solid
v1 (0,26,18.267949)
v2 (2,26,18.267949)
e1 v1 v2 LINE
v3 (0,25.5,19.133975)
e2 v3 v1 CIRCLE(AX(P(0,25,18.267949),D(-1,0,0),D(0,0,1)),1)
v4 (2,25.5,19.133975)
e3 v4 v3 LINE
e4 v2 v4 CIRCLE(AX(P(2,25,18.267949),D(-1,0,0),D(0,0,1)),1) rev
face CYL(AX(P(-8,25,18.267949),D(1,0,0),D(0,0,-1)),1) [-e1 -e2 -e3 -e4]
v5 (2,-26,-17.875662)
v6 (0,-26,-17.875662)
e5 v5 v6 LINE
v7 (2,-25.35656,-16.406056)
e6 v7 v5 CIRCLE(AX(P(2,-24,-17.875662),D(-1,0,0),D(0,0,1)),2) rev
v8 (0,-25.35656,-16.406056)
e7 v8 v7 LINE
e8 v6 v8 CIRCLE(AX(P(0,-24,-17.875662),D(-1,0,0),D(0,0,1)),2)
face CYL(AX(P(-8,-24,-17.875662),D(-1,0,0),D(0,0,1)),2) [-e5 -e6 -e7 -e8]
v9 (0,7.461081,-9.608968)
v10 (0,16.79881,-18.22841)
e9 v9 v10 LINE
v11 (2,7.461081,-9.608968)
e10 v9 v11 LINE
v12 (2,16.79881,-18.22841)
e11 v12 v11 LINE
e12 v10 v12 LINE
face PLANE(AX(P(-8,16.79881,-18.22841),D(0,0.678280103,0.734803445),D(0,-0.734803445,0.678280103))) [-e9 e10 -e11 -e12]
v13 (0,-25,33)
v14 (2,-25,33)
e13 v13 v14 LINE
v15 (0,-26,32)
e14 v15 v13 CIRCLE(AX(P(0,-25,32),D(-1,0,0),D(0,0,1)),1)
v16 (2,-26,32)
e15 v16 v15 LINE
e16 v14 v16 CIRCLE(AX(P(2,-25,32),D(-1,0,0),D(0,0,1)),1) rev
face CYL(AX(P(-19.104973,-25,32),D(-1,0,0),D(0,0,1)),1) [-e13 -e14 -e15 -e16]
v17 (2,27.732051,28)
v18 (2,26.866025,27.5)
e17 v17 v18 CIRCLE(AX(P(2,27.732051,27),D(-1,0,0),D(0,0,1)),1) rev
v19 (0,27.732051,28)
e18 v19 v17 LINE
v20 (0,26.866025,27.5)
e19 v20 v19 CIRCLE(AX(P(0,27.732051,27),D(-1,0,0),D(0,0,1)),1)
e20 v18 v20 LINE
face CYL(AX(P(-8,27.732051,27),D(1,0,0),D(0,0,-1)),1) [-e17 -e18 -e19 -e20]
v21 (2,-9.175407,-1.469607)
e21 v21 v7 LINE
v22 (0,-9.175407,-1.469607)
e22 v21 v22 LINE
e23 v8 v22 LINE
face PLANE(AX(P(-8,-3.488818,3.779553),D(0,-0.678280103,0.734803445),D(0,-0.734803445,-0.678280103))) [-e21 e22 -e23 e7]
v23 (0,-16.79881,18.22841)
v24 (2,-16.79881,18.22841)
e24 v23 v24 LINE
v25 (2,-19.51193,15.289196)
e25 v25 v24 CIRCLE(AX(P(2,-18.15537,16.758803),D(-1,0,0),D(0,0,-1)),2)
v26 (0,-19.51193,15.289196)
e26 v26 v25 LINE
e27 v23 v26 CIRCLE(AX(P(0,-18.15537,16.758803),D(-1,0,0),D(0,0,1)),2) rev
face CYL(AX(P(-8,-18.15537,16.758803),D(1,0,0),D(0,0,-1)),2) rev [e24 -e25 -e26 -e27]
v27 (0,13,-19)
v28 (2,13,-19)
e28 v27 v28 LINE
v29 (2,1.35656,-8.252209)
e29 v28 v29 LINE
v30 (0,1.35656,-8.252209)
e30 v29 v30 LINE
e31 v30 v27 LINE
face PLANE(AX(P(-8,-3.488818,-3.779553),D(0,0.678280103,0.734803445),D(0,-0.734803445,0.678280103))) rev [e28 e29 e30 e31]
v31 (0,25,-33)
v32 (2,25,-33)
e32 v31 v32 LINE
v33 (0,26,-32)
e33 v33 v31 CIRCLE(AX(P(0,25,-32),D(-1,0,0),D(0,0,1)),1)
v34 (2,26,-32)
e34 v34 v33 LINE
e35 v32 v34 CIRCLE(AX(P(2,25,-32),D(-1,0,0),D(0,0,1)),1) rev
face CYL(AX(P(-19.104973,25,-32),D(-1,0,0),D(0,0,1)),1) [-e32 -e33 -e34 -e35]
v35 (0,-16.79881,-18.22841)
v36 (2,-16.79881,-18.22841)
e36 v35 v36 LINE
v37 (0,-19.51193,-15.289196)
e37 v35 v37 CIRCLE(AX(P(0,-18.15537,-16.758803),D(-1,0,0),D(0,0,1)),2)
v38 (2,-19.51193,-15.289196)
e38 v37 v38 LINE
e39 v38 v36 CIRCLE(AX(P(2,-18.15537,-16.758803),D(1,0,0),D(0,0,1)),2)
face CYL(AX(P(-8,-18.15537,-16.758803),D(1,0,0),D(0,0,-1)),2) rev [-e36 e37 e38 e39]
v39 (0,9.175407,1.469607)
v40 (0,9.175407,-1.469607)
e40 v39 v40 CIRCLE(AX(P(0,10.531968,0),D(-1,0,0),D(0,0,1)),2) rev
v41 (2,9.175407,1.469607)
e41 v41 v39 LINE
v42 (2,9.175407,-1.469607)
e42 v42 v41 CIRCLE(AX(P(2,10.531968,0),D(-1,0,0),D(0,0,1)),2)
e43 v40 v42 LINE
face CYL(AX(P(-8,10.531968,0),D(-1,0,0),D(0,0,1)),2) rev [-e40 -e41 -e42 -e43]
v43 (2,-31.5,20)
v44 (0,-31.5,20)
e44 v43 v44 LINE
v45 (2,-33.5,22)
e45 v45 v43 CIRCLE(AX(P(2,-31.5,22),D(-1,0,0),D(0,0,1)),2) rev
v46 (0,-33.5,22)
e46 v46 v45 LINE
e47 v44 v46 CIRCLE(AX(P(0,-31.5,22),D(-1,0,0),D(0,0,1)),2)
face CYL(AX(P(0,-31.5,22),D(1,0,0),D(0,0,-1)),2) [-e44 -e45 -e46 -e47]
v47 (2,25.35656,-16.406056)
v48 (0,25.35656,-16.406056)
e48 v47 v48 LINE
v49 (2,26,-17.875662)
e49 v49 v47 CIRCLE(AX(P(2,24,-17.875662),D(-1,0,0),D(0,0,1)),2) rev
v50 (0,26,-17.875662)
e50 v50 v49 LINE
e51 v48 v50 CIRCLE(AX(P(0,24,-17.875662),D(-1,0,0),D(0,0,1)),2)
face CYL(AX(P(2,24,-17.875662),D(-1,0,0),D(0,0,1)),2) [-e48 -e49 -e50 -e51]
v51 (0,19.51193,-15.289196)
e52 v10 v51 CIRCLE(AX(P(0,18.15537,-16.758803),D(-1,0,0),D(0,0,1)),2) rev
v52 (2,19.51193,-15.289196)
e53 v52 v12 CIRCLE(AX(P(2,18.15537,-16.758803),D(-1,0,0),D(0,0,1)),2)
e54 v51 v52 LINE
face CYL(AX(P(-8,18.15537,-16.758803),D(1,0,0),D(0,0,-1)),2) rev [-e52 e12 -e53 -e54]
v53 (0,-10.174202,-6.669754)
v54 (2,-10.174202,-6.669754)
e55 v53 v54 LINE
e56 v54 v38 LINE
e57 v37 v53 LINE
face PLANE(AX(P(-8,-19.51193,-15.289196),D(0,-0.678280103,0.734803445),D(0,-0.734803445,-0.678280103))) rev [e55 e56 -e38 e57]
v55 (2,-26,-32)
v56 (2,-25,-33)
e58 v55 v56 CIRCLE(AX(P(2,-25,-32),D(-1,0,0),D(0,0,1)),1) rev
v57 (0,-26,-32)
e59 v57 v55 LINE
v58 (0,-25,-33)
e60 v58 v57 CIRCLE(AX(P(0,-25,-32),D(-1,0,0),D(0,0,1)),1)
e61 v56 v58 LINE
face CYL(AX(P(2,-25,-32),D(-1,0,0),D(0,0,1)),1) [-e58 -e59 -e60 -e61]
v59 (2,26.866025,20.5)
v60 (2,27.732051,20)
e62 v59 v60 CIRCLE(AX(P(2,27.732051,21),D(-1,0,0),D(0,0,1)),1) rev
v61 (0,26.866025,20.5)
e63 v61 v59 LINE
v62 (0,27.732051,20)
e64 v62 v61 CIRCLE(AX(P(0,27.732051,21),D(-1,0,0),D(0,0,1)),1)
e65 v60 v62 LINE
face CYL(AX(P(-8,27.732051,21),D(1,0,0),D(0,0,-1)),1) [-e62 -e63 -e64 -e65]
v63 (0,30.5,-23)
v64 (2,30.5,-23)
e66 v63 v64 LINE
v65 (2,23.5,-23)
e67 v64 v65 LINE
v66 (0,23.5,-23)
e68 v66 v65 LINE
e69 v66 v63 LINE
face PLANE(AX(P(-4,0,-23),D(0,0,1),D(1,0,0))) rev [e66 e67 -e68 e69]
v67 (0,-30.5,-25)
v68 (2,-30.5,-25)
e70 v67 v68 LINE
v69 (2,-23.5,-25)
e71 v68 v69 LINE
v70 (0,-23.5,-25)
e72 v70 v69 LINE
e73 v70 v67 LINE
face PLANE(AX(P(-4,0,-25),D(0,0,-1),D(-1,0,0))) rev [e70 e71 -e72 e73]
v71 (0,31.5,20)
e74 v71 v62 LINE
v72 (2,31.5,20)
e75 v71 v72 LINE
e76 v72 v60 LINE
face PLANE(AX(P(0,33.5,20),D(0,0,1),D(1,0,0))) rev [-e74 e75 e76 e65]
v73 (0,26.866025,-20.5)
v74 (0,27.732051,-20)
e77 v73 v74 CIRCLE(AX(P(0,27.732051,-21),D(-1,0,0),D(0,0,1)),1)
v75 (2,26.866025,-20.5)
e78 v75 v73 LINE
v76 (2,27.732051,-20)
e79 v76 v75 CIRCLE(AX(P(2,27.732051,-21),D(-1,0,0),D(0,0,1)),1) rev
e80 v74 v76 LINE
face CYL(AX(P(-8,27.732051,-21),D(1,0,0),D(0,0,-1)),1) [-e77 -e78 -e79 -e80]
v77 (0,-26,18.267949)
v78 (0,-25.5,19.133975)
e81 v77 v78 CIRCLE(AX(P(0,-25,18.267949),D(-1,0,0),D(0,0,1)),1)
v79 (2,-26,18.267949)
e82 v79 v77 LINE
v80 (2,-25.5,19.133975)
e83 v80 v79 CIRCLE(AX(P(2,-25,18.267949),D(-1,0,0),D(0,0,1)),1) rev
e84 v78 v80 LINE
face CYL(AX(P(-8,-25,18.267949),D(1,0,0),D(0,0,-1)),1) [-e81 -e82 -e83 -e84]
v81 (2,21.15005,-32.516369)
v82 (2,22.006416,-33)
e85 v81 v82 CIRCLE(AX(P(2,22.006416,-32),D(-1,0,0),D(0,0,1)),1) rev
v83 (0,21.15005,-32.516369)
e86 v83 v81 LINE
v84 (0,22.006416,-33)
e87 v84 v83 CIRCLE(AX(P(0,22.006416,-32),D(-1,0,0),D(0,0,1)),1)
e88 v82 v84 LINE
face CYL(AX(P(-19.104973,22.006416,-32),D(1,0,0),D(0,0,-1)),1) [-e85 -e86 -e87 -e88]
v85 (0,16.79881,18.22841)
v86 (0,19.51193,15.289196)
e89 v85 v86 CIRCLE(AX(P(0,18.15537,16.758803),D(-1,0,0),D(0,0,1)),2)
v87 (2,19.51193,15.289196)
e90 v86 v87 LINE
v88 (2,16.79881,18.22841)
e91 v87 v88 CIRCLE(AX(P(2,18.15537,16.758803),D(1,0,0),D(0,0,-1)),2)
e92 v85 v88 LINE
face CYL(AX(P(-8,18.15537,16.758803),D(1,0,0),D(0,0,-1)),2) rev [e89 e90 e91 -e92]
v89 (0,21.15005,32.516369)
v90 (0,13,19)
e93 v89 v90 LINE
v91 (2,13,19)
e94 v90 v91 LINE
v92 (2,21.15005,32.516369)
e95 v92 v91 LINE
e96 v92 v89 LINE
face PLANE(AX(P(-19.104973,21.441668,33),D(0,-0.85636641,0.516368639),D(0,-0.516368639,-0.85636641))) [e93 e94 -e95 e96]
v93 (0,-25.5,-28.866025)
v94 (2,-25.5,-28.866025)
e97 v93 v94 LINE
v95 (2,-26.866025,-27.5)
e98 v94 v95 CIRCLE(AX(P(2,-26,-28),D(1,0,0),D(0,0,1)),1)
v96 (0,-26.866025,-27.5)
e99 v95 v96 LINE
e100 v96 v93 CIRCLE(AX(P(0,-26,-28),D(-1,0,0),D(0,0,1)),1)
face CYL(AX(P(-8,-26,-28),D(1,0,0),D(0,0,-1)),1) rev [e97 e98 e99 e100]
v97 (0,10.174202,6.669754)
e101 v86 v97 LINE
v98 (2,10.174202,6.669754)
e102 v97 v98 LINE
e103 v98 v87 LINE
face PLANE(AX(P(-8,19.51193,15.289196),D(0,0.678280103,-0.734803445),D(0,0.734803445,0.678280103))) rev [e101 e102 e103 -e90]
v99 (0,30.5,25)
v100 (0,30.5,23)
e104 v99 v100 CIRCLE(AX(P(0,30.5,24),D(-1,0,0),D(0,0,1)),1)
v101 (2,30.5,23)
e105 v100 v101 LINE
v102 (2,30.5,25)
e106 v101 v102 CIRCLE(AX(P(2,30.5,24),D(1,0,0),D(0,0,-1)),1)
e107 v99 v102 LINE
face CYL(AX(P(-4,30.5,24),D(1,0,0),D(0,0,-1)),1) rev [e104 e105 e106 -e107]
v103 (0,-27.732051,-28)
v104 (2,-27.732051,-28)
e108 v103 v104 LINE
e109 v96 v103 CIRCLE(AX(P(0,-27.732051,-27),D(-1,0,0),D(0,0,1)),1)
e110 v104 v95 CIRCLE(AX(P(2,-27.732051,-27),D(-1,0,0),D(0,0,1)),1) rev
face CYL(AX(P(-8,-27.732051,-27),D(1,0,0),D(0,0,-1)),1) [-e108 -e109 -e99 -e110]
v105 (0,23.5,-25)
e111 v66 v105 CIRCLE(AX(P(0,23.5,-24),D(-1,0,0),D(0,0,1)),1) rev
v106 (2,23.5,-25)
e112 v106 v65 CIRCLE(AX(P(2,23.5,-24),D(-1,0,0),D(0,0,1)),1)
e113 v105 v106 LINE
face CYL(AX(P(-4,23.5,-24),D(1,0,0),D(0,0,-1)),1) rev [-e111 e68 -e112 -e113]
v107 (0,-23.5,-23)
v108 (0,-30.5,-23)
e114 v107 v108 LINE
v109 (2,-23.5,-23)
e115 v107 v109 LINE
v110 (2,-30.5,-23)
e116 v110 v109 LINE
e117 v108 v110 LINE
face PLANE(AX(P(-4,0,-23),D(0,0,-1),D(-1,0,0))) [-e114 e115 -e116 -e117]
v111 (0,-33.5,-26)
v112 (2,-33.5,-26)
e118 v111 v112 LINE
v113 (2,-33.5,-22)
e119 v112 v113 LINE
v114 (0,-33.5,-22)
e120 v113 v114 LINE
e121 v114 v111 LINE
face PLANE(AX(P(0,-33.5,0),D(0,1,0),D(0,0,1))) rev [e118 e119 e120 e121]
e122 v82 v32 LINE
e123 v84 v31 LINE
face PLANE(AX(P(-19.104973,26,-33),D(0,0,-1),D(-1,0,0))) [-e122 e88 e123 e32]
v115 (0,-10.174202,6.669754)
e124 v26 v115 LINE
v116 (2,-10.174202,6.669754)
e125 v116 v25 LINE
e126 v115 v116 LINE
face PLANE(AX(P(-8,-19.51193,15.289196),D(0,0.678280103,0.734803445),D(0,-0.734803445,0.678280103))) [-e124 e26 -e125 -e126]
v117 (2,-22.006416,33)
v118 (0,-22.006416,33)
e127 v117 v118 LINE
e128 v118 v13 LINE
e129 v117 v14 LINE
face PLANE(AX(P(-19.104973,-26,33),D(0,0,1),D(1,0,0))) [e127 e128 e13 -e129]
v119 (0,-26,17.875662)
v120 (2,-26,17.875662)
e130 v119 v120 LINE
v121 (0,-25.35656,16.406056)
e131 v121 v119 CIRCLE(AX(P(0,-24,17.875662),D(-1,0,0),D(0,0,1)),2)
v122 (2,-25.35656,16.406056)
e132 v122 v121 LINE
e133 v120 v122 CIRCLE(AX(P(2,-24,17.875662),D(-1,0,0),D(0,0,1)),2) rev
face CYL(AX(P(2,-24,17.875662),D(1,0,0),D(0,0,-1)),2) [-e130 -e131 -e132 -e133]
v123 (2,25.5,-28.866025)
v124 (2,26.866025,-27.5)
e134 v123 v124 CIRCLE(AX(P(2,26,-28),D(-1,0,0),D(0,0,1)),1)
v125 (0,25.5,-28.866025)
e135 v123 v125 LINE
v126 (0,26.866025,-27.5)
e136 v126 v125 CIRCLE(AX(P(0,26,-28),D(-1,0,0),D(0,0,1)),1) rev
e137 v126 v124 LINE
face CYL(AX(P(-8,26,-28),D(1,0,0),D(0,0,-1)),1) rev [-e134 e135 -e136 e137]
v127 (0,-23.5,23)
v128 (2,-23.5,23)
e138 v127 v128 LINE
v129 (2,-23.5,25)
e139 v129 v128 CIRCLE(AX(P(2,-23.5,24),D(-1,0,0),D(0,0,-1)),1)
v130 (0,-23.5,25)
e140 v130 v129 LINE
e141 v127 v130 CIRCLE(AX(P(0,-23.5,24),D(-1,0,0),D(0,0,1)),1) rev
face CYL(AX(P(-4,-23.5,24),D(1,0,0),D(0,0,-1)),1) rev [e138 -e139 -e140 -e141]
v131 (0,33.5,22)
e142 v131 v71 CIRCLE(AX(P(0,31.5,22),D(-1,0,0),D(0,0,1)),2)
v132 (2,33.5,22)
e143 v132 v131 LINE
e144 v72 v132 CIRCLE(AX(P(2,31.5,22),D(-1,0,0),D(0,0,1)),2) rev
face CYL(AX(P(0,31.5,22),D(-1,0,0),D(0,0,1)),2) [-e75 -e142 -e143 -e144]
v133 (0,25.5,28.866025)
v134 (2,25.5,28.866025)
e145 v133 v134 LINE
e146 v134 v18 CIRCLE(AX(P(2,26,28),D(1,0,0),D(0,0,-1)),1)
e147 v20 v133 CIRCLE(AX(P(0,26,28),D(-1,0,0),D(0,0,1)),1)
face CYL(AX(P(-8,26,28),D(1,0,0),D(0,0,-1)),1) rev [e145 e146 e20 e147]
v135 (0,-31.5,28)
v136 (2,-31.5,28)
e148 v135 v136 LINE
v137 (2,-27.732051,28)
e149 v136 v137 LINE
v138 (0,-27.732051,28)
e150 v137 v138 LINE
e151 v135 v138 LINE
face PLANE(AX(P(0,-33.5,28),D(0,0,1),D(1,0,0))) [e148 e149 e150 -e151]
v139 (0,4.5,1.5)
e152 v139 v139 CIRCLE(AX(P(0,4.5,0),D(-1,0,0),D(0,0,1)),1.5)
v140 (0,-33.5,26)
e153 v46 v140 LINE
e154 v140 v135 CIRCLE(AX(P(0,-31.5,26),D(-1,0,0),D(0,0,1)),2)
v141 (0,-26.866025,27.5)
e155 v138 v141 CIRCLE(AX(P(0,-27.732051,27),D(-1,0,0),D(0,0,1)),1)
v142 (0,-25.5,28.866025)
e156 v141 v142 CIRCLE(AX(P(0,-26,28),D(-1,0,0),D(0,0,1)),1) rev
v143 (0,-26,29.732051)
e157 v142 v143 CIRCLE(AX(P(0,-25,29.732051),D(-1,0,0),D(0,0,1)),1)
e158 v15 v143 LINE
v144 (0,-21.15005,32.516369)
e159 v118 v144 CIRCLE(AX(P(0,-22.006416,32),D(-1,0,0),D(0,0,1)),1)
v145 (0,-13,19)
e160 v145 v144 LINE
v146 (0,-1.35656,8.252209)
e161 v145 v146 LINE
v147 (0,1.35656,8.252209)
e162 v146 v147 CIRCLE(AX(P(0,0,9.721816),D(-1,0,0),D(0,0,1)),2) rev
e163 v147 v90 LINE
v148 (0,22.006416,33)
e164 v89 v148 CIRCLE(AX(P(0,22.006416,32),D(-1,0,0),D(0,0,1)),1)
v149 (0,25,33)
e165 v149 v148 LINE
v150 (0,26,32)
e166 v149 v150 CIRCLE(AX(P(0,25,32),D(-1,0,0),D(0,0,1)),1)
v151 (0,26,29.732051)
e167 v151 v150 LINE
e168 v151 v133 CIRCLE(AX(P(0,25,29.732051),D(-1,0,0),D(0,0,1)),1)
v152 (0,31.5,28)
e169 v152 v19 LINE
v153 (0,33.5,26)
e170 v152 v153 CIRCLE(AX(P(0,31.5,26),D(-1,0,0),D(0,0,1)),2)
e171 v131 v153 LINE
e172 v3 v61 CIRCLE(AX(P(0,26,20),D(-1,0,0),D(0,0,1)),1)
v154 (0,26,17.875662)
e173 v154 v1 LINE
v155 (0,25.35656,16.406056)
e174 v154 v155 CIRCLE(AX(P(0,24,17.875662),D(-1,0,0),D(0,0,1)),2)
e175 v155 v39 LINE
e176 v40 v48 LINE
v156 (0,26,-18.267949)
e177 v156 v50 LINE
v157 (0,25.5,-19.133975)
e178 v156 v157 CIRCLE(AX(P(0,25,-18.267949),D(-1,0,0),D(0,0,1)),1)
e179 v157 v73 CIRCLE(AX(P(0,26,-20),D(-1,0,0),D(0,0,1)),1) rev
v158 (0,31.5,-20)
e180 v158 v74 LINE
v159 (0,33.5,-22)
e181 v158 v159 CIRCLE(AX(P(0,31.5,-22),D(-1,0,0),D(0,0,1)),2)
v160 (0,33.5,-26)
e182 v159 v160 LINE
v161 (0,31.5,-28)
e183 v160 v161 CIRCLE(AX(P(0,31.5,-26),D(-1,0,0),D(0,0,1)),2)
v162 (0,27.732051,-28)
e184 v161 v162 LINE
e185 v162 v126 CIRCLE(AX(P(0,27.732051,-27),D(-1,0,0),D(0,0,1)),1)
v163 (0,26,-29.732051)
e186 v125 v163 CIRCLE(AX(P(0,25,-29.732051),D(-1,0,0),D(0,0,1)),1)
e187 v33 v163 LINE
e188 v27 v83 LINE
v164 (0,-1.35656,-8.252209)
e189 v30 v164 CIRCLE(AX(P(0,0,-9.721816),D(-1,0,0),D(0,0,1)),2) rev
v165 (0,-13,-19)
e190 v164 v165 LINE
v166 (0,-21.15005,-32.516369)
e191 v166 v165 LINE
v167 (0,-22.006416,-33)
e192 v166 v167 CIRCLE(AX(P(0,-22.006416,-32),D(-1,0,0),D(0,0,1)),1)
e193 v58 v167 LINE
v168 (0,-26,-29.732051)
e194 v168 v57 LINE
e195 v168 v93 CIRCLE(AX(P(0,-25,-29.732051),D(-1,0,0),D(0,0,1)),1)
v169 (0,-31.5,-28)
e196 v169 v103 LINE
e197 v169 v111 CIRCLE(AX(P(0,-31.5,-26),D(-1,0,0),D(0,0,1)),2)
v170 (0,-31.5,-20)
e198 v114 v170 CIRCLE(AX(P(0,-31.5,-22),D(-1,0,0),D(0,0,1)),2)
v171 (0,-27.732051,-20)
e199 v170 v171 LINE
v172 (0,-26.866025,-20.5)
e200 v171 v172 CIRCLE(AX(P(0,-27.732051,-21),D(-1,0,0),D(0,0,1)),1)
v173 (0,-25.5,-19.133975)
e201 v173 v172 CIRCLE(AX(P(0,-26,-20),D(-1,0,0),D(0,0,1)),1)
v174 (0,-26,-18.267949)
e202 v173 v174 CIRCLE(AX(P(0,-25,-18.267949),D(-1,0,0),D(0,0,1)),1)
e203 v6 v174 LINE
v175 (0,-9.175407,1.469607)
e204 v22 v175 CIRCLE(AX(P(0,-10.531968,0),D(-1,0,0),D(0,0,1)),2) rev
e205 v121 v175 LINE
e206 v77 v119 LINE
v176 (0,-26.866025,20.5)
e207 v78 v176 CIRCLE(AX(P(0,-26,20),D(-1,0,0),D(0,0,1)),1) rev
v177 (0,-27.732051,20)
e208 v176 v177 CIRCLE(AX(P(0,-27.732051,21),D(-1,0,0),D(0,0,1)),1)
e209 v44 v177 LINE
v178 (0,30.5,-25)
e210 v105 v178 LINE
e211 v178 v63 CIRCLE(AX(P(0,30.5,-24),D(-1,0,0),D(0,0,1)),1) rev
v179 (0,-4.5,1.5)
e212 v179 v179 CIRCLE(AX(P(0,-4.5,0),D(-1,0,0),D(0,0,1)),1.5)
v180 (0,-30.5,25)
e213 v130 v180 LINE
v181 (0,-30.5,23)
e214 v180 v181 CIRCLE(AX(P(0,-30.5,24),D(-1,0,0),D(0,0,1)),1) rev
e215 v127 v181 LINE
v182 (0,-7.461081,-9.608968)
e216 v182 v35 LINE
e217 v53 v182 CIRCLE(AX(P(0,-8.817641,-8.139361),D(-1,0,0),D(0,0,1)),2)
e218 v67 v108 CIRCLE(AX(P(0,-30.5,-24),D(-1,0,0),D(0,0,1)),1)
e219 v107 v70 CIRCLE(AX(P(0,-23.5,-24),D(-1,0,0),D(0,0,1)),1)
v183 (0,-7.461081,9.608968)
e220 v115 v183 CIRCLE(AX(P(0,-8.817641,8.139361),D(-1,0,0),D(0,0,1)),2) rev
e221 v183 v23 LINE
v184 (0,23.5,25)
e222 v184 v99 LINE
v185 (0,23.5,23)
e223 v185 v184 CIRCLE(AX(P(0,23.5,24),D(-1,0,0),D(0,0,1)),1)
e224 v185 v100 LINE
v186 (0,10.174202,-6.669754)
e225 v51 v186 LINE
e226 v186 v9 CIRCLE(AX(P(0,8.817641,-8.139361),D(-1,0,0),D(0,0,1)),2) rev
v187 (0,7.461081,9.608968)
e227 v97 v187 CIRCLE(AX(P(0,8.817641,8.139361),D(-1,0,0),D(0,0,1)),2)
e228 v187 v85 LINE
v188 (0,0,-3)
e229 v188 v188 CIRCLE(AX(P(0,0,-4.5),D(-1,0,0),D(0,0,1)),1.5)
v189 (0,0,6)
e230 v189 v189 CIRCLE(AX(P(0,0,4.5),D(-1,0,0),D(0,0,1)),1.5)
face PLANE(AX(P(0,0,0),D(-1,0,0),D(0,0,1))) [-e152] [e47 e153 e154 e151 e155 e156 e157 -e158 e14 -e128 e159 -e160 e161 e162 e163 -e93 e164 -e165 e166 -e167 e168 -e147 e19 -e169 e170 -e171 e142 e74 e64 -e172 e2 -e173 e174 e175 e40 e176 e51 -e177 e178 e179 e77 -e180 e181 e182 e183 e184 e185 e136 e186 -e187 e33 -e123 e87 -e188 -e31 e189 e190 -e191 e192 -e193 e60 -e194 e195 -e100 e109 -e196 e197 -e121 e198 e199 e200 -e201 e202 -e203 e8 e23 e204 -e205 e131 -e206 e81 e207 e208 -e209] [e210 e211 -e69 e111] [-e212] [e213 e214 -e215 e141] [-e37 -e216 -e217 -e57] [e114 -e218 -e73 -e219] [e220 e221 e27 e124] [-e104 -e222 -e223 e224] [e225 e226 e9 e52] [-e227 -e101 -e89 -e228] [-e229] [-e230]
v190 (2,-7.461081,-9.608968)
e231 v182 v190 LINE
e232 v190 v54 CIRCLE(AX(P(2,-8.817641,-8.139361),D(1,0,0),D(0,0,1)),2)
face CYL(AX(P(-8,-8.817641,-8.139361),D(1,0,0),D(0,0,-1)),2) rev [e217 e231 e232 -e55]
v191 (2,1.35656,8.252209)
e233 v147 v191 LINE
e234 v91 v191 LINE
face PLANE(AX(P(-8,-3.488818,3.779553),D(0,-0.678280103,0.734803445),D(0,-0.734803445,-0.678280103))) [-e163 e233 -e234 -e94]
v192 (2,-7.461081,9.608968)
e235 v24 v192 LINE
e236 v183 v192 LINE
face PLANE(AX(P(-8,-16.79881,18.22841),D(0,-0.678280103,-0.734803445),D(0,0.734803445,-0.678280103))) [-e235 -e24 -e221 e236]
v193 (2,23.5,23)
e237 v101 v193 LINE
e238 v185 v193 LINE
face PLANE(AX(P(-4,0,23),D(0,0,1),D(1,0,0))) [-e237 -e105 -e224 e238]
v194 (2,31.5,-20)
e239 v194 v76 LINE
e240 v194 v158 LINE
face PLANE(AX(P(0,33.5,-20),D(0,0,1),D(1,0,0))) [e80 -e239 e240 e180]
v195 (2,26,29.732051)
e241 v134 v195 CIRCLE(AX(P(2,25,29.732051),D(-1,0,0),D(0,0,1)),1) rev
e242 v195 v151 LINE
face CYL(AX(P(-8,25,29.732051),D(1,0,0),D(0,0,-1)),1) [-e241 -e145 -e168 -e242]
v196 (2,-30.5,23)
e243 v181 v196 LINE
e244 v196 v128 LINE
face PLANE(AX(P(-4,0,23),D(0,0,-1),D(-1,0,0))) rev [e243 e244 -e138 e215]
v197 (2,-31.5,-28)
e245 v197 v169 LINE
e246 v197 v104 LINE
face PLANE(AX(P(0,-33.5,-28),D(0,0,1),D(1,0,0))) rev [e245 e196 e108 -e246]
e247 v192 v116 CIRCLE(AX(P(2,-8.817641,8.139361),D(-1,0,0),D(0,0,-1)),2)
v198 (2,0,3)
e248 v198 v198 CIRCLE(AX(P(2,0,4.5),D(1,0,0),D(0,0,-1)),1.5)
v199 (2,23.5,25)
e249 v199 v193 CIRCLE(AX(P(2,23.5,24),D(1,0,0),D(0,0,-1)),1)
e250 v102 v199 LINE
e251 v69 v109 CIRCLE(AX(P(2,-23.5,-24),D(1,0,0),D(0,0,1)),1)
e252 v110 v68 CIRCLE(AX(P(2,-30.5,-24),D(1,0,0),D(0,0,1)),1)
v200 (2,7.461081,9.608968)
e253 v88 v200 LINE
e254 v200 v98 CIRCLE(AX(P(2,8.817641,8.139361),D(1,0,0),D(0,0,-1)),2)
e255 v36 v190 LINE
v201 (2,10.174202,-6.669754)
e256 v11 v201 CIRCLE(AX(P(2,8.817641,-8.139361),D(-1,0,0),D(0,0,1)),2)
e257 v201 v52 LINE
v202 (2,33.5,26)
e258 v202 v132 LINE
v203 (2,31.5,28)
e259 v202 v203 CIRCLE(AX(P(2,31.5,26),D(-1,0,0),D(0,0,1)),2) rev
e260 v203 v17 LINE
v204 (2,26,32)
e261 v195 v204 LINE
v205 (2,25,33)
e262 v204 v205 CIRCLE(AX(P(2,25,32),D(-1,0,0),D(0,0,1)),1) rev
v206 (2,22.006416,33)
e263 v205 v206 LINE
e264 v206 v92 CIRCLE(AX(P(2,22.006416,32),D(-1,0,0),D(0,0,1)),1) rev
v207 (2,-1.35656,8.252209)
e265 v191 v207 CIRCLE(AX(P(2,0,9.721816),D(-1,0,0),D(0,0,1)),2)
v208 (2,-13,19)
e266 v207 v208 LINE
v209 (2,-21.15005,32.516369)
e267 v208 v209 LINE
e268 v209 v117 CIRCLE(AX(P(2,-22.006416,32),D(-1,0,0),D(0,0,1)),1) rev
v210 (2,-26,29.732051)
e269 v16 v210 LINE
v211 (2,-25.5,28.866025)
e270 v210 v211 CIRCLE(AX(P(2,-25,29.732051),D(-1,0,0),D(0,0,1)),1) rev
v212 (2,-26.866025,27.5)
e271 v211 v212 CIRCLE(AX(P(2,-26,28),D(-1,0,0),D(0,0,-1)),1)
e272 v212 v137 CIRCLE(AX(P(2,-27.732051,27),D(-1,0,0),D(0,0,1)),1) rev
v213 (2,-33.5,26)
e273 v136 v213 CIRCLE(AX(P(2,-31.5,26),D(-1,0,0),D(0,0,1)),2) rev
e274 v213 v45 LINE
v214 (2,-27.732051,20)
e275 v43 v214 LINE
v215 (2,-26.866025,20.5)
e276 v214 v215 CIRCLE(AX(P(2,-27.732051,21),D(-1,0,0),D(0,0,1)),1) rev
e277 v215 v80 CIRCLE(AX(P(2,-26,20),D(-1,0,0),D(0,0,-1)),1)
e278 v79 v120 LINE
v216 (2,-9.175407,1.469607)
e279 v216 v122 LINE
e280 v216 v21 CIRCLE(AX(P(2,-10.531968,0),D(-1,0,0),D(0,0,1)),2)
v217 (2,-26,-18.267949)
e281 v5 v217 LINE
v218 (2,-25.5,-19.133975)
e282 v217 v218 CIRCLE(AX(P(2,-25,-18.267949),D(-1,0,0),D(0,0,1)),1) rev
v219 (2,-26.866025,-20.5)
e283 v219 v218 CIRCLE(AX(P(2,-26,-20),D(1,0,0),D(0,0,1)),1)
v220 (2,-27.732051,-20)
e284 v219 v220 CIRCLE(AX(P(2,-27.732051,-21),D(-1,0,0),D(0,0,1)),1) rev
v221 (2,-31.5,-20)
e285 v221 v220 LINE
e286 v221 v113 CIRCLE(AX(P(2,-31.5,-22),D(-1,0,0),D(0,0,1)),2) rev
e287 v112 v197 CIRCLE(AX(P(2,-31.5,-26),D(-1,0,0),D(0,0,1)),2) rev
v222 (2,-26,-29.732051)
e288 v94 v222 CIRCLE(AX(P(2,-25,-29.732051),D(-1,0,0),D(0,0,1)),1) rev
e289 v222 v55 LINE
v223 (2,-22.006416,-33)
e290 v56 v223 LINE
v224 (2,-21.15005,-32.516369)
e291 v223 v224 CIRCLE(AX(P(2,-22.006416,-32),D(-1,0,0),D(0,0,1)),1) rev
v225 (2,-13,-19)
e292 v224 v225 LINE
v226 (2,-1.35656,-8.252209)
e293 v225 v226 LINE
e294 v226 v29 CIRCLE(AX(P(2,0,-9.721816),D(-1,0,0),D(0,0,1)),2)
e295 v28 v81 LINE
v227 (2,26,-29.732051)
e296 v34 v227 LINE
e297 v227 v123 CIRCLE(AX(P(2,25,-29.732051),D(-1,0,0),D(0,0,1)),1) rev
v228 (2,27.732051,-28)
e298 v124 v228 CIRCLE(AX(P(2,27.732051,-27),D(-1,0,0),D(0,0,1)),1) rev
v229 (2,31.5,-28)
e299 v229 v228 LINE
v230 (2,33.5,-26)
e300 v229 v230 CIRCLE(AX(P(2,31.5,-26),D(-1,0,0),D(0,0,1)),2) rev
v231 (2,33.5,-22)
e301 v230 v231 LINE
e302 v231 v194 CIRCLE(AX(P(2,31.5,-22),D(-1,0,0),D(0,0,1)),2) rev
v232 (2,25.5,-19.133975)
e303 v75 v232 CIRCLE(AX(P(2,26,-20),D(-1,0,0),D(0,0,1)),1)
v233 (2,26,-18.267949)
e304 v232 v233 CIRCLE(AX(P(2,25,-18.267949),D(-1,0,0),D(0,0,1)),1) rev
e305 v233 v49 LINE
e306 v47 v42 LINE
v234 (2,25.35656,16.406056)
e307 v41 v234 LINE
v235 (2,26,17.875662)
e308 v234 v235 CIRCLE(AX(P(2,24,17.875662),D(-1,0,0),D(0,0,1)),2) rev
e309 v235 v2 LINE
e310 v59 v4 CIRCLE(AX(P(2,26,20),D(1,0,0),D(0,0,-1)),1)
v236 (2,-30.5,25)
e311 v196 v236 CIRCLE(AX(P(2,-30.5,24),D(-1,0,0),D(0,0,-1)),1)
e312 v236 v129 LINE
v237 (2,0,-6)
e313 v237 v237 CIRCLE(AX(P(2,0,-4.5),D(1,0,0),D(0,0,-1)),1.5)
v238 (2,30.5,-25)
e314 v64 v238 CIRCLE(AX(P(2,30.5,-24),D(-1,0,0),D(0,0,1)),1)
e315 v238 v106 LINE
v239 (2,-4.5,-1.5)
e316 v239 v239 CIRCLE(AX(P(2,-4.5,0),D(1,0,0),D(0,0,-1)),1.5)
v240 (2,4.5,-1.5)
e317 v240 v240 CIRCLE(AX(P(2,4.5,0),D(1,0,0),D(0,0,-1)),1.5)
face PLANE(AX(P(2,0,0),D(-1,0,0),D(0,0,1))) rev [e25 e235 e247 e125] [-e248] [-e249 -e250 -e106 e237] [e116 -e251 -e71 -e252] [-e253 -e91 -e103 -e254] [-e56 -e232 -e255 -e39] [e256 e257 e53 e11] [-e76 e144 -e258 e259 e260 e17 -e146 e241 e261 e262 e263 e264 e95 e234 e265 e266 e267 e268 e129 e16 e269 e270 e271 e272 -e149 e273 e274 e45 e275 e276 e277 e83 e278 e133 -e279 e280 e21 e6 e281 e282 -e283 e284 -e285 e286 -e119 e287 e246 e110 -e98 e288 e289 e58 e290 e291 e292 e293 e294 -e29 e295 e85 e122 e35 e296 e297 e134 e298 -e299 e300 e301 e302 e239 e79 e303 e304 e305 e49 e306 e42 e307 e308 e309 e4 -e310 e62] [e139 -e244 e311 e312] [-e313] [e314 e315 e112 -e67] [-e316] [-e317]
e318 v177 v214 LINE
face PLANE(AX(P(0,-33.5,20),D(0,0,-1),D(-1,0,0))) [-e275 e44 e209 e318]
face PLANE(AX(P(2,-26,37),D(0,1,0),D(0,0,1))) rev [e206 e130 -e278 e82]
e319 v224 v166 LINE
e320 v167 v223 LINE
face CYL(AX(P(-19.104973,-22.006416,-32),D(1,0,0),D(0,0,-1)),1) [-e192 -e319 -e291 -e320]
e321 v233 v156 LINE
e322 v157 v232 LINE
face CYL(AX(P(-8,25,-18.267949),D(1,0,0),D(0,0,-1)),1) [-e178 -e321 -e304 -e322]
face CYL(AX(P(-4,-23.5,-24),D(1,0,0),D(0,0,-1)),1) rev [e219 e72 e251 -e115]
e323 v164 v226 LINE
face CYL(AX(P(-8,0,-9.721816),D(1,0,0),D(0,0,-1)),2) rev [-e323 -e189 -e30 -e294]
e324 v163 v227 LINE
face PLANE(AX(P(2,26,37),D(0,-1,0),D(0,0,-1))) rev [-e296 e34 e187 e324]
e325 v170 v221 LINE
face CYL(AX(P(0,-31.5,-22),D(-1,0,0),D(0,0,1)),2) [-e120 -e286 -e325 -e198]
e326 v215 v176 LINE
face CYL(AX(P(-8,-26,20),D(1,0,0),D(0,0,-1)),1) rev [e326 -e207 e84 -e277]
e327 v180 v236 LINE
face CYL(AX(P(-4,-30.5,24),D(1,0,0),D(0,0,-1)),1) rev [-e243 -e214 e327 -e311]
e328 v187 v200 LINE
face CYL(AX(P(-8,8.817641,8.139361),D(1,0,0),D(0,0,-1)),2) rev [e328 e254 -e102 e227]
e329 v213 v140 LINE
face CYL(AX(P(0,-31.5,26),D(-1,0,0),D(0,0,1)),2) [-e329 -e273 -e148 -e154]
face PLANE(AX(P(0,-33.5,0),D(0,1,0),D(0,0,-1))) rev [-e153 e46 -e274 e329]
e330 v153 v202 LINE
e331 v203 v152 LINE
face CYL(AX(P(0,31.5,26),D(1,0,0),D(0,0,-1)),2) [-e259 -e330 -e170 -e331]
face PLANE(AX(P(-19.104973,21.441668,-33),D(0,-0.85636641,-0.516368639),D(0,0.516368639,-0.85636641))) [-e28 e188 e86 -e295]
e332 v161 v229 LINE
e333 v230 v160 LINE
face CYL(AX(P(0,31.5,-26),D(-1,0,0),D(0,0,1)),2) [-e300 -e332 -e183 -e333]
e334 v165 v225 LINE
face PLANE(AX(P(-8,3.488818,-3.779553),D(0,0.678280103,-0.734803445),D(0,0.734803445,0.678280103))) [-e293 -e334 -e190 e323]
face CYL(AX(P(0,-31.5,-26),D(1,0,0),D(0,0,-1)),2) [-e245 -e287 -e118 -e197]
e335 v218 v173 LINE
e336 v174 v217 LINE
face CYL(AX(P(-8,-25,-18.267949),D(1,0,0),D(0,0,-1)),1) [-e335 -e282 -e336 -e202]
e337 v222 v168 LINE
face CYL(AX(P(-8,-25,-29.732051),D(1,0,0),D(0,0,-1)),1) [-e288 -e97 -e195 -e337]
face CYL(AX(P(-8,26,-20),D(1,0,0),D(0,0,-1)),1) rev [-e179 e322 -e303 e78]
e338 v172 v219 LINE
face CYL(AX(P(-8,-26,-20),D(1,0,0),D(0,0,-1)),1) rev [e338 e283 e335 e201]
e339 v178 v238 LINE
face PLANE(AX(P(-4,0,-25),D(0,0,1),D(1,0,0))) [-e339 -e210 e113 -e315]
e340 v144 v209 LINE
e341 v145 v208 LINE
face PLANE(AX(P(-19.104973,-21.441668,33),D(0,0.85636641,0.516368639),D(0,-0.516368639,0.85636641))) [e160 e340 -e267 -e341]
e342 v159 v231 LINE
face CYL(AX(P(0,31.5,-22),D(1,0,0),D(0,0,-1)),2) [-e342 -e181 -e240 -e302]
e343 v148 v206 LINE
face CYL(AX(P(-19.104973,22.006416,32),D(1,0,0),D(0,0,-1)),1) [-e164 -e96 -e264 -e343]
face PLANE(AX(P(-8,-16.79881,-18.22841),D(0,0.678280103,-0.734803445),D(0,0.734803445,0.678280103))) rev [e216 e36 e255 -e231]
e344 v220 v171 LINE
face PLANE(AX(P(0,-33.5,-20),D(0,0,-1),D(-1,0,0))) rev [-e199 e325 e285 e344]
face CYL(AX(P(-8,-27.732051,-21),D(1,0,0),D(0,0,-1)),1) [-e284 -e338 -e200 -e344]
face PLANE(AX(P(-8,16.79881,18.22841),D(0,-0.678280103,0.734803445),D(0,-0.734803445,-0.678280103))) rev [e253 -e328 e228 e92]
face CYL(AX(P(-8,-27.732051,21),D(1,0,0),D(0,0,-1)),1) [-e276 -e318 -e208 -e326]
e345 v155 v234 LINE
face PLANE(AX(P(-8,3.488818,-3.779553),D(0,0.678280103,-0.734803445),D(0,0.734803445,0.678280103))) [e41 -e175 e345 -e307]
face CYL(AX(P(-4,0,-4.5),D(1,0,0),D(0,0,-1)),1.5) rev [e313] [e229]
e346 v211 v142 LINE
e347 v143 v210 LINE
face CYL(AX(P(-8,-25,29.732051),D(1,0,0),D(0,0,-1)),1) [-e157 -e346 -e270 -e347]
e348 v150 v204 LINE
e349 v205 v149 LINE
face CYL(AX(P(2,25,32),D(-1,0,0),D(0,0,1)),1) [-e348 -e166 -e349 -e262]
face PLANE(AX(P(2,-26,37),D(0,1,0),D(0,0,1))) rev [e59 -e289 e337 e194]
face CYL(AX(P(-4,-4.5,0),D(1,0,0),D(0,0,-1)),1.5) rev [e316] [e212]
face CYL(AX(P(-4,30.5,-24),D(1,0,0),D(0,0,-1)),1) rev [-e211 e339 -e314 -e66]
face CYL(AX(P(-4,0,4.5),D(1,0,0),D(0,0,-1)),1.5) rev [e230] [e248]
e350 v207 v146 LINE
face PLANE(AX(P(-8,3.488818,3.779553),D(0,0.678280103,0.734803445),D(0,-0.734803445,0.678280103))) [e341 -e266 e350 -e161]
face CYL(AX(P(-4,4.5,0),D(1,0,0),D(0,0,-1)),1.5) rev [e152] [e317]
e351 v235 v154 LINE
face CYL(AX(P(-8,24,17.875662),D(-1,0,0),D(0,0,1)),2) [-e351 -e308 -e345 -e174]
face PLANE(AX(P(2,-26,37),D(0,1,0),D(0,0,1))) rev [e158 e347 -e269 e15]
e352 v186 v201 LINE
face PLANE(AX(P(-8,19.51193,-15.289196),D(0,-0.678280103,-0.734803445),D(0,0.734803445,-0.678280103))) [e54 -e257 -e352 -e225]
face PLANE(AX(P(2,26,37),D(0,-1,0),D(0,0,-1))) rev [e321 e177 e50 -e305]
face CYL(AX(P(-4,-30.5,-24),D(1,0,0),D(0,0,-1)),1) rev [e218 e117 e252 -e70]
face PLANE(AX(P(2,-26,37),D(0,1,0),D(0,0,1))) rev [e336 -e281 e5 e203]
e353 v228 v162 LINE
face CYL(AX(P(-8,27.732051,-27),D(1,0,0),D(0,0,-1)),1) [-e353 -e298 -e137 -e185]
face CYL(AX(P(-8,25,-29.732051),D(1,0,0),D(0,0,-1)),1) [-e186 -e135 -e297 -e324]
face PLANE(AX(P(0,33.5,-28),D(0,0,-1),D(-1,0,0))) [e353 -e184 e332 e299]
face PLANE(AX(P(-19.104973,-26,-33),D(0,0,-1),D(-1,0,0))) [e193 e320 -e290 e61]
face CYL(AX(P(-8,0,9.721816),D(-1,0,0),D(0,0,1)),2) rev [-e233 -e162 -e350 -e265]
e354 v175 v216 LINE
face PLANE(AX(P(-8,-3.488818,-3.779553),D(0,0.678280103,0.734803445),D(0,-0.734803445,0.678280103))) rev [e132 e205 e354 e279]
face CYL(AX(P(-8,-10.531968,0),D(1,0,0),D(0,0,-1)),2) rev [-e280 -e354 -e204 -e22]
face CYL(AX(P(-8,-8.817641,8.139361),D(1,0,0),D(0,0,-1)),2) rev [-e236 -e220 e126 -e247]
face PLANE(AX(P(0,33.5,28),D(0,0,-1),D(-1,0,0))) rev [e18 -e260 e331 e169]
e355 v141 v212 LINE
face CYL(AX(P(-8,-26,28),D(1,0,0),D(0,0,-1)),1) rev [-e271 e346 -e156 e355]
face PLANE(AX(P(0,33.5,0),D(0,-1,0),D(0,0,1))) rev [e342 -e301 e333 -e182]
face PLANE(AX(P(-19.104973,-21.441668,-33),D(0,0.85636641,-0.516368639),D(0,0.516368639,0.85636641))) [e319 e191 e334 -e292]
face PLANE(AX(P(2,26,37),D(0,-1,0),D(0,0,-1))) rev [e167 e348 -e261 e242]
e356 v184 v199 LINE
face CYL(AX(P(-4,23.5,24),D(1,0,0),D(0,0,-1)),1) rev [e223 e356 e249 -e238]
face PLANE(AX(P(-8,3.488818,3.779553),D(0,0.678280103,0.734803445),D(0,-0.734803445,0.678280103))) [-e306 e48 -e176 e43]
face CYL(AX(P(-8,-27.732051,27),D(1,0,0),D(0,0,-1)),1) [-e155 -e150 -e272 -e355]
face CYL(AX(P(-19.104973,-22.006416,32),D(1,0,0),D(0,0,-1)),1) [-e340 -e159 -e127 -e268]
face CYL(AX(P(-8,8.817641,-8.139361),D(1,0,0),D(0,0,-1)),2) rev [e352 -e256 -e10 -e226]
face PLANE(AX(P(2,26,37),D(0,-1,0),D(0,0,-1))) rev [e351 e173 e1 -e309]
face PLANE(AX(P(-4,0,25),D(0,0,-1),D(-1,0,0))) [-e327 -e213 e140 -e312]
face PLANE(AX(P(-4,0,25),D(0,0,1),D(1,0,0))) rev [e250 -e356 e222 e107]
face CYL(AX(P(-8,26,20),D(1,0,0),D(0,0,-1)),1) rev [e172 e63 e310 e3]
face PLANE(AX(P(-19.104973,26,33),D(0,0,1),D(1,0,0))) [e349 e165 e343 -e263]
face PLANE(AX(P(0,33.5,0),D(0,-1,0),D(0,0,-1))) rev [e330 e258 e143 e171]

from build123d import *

# Parameters (mm, degrees)
SKETCH_1_W               = 74
SKETCH_1_H               = 52
EXTRUDE_1_DEPTH          = 2
CUT_EXTRUDE_2_DEPTH      = 10
SKETCH_3_W               = 2
SKETCH_3_H               = 8
EXTRUDE_3_DEPTH          = 7.5
FILLET_1_R               = 2
FILLET_1_OF_MIRROR_3_R   = 2
MIRROR_4_DEPTH           = 2
EXTRUDE_4_DEPTH          = 2
FILLET_3_R               = 1
FILLET_4_R               = 2
SKETCH_4_R               = 1.5
CUT_EXTRUDE_3_DEPTH      = 6
SKETCH_5_R               = 1
CUT_EXTRUDE_5_DEPTH      = 6
MIRROR_6_COPY_1_SKETCH_R = 1
MIRROR_6_COPY_1_DEPTH    = 6
SKETCH_6_R               = 1
CUT_EXTRUDE_6_DEPTH      = 10
MIRROR_9_COPY_1_SKETCH_R = 1
MIRROR_9_COPY_1_DEPTH    = 10
FILLET_5_R               = 1
CUT_EXTRUDE_7_DEPTH      = 10
MIRROR_12_COPY_1_DEPTH   = 10


# Read off the part's stored shape, not the designer's step: 镜向4
with BuildPart() as part:
    # 草图1 → 凸台-拉伸1 (new body)
    with BuildSketch(Plane(origin=(0, 0, 0), x_dir=(0, 0, -1), z_dir=(1, 0, 0))):
        Rectangle(SKETCH_1_W, SKETCH_1_H)
    extrude(amount=EXTRUDE_1_DEPTH)

    # 草图2 → 切除-拉伸2 (cut)
    with BuildSketch(Plane(origin=(2, 0, 0), x_dir=(0, 0, -1), z_dir=(1, 0, 0))):
        Polygon((-7, 0), (-31, 26), (-37, 26), (-37, -26), (-31, -26), align=None)
        Polygon((17, 26), (-17, 26), (0, 7.583333333), align=None)
        Polygon((31, 26), (7, 0), (31, -26), (37, -26), (37, 26), align=None)
        Polygon((17, -26), (0, -7.583333333), (-17, -26), align=None)
    extrude(amount=-CUT_EXTRUDE_2_DEPTH, mode=Mode.SUBTRACT)

    # 草图3 → 凸台-拉伸3 (add)
    with BuildSketch(Plane(origin=(0, 26, 0), x_dir=(1, 0, 0), z_dir=(0, 1, 0))):
        with Locations((1, -24)):
            Rectangle(SKETCH_3_W, SKETCH_3_H)
    extrude_3 = extrude(amount=EXTRUDE_3_DEPTH)

    # 圆角1
    fillet_1_edges = [part.edges().sort_by_distance(p)[0] for p in [
        (1, 33.5, 28),
        (1, 33.5, 20),
    ]]
    fillet(fillet_1_edges, radius=FILLET_1_R)

    # 镜向3: 凸台-拉伸3 across plane
    add(extrude_3.mirror(Plane.XY))

    # 圆角1 of 镜向3
    fillet_1_of_mirror_3_edges = [part.edges().sort_by_distance(p)[0] for p in [
        (1, 33.5, -28),
        (1, 33.5, -20),
    ]]
    fillet(fillet_1_of_mirror_3_edges, radius=FILLET_1_OF_MIRROR_3_R)

    # 镜向4 outline → 镜向4 (add)
    with BuildSketch(Plane.YZ):
        with BuildLine():
            Line((-26, 20), (-26, 28))
            Line((-26, 28), (-31.5, 28))
            ThreePointArc((-31.5, 28), (-32.914213562, 27.414213562), (-33.5, 26))
            Line((-33.5, 26), (-33.5, 22))
            ThreePointArc((-33.5, 22), (-32.914213562, 20.585786438), (-31.5, 20))
            Line((-31.5, 20), (-26, 20))
        make_face()
        with BuildLine():
            Line((-26, -20), (-31.5, -20))
            ThreePointArc((-31.5, -20), (-32.914213562, -20.585786438), (-33.5, -22))
            Line((-33.5, -22), (-33.5, -26))
            ThreePointArc((-33.5, -26), (-32.914213562, -27.414213562), (-31.5, -28))
            Line((-31.5, -28), (-26, -28))
            Line((-26, -28), (-26, -20))
        make_face()
    extrude(amount=MIRROR_4_DEPTH)

    # 草图7 → 凸台-拉伸4 (add)
    with BuildSketch(Plane(origin=(2, 0, 0), x_dir=(0, 0, -1), z_dir=(1, 0, 0))):
        Polygon((-28, 26), (-33, 26), (-33, 21.44166802), (-19, 13), align=None)
        Polygon((19, 13), (28, 26), (33, 26), (33, 21.44166802), align=None)
        Polygon((28, -26), (33, -26), (33, -21.44166802), (19, -13), align=None)
        Polygon((-19, -13), (-28, -26), (-33, -26), (-33, -21.44166802), align=None)
    extrude(amount=-EXTRUDE_4_DEPTH)

    # 圆角3
    fillet_3_edges = [part.edges().sort_by_distance(p)[0] for p in [
        (1, 26, 33),
        (1, 21.44166802, 33),
        (1, 26, -33),
        (1, 21.44166802, -33),
        (1, -26, -33),
        (1, -21.44166802, -33),
        (1, -26, 33),
        (1, -21.44166802, 33),
    ]]
    fillet(fillet_3_edges, radius=FILLET_3_R)

    # 圆角4
    fillet_4_edges = [part.edges().sort_by_distance(p)[0] for p in [
        (1, 0, -7),
        (1, 26, -17),
        (1, 7.583333333, 0),
        (1, 26, 17),
        (1, -7.583333333, 0),
        (1, -26, -17),
        (1, -26, 17),
        (1, 0, 7),
    ]]
    fillet(fillet_4_edges, radius=FILLET_4_R)

    # 草图4 → 切除-拉伸3 (cut)
    with BuildSketch(Plane(origin=(2, 0, 0), x_dir=(0, 0, -1), z_dir=(1, 0, 0))):
        with Locations((0, -4.5)):
            Circle(SKETCH_4_R)
        with Locations((-4.5, 0)):
            Circle(SKETCH_4_R)
        with Locations((0, 4.5)):
            Circle(SKETCH_4_R)
        with Locations((4.5, 0)):
            Circle(SKETCH_4_R)
    extrude(amount=-CUT_EXTRUDE_3_DEPTH, mode=Mode.SUBTRACT)

    # 草图5 → 切除-拉伸5 (cut)
    with BuildSketch(Plane(origin=(2, 0, 0), x_dir=(0, 0, -1), z_dir=(1, 0, 0))):
        with Locations((-24, 30.5)):
            Circle(SKETCH_5_R)
        with BuildLine():
            ThreePointArc((-23, 30.5), (-24, 29.5), (-25, 30.5))
            Line((-25, 30.5), (-25, 23.5))
            ThreePointArc((-25, 23.5), (-24, 24.5), (-23, 23.5))
            Line((-23, 23.5), (-23, 30.5))
        make_face()
        with Locations((-24, 23.5)):
            Circle(SKETCH_5_R)
    cut_extrude_5 = extrude(amount=-CUT_EXTRUDE_5_DEPTH, mode=Mode.SUBTRACT)

    # 镜向5: 切除-拉伸5 across plane
    add(cut_extrude_5.mirror(Plane.XY), mode=Mode.SUBTRACT)

    # 镜向6: 切除-拉伸5 across plane
    add(cut_extrude_5.mirror(Plane.ZX), mode=Mode.SUBTRACT)

    # 镜向6 copy 1 sketch → 镜向6 copy 1 (cut)
    with BuildSketch(Plane(origin=(2, 0, 0), x_dir=(0, 0, 1), z_dir=(1, 0, 0))):
        with Locations((-24, 30.5)):
            Circle(MIRROR_6_COPY_1_SKETCH_R)
        with BuildLine():
            ThreePointArc((-23, 30.5), (-24, 29.5), (-25, 30.5))
            Line((-25, 30.5), (-25, 23.5))
            ThreePointArc((-25, 23.5), (-24, 24.5), (-23, 23.5))
            Line((-23, 23.5), (-23, 30.5))
        make_face()
        with Locations((-24, 23.5)):
            Circle(MIRROR_6_COPY_1_SKETCH_R)
    extrude(amount=-MIRROR_6_COPY_1_DEPTH, mode=Mode.SUBTRACT)

    # 草图6 → 切除-拉伸6 (cut)
    with BuildSketch(Plane(origin=(2, 0, 0), x_dir=(0, 0, -1), z_dir=(1, 0, 0))):
        with Locations((-20, 26)):
            Circle(SKETCH_6_R)
        with Locations((-28, 26)):
            Circle(SKETCH_6_R)
    cut_extrude_6 = extrude(amount=-CUT_EXTRUDE_6_DEPTH, mode=Mode.SUBTRACT)

    # 镜向8: 切除-拉伸6 across plane
    add(cut_extrude_6.mirror(Plane.ZX), mode=Mode.SUBTRACT)

    # 镜向9: 切除-拉伸6 across plane
    add(cut_extrude_6.mirror(Plane.XY), mode=Mode.SUBTRACT)

    # 镜向9 copy 1 sketch → 镜向9 copy 1 (cut)
    with BuildSketch(Plane(origin=(2, 0, 0), x_dir=(0, 0, 1), z_dir=(1, 0, 0))):
        with Locations((-20, 26)):
            Circle(MIRROR_9_COPY_1_SKETCH_R)
        with Locations((-28, 26)):
            Circle(MIRROR_9_COPY_1_SKETCH_R)
    extrude(amount=-MIRROR_9_COPY_1_DEPTH, mode=Mode.SUBTRACT)

    # 圆角5
    fillet_5_edges = [part.edges().sort_by_distance(p)[0] for p in [
        (1, 27, 20),
        (1, 27, 28),
        (1, 26, 19),
        (1, 26, 29),
        (1, -27, 28),
        (1, -27, 20),
        (1, -26, 19),
        (1, -26, 29),
        (1, -27, -20),
        (1, -27, -28),
        (1, -26, -19),
        (1, -26, -29),
        (1, 27, -28),
        (1, 27, -20),
        (1, 26, -19),
        (1, 26, -29),
    ]]
    fillet(fillet_5_edges, radius=FILLET_5_R)

    # 草图8 → 切除-拉伸7 (cut)
    with BuildSketch(Plane(origin=(2, 0, 0), x_dir=(0, 0, -1), z_dir=(1, 0, 0))):
        with BuildLine():
            Line((-15.289196292, 19.511930318), (-6.669754344, 10.174201541))
            ThreePointArc((-6.669754344, 10.174201541), (-6.782801027, 7.348034446), (-9.608968122, 7.46108113))
            Line((-9.608968122, 7.46108113), (-18.22841007, 16.798809907))
            ThreePointArc((-18.22841007, 16.798809907), (-18.115363387, 19.624977002), (-15.289196292, 19.511930318))
        make_face()
    cut_extrude_7 = extrude(amount=-CUT_EXTRUDE_7_DEPTH, mode=Mode.SUBTRACT)

    # 镜向11: 切除-拉伸7 across plane
    add(cut_extrude_7.mirror(Plane.XY), mode=Mode.SUBTRACT)

    # 镜向12: 切除-拉伸7 across plane
    add(cut_extrude_7.mirror(Plane.ZX), mode=Mode.SUBTRACT)

    # 镜向12 copy 1 sketch → 镜向12 copy 1 (cut)
    with BuildSketch(Plane(origin=(2, 0, 0), x_dir=(0, 0, 1), z_dir=(1, 0, 0))):
        with BuildLine():
            Line((-15.289196292, 19.511930318), (-6.669754344, 10.174201541))
            ThreePointArc((-6.669754344, 10.174201541), (-6.782801027, 7.348034446), (-9.608968122, 7.46108113))
            Line((-9.608968122, 7.46108113), (-18.22841007, 16.798809907))
            ThreePointArc((-18.22841007, 16.798809907), (-18.115363387, 19.624977002), (-15.289196292, 19.511930318))
        make_face()
    extrude(amount=-MIRROR_12_COPY_1_DEPTH, mode=Mode.SUBTRACT)


solid = part.part
